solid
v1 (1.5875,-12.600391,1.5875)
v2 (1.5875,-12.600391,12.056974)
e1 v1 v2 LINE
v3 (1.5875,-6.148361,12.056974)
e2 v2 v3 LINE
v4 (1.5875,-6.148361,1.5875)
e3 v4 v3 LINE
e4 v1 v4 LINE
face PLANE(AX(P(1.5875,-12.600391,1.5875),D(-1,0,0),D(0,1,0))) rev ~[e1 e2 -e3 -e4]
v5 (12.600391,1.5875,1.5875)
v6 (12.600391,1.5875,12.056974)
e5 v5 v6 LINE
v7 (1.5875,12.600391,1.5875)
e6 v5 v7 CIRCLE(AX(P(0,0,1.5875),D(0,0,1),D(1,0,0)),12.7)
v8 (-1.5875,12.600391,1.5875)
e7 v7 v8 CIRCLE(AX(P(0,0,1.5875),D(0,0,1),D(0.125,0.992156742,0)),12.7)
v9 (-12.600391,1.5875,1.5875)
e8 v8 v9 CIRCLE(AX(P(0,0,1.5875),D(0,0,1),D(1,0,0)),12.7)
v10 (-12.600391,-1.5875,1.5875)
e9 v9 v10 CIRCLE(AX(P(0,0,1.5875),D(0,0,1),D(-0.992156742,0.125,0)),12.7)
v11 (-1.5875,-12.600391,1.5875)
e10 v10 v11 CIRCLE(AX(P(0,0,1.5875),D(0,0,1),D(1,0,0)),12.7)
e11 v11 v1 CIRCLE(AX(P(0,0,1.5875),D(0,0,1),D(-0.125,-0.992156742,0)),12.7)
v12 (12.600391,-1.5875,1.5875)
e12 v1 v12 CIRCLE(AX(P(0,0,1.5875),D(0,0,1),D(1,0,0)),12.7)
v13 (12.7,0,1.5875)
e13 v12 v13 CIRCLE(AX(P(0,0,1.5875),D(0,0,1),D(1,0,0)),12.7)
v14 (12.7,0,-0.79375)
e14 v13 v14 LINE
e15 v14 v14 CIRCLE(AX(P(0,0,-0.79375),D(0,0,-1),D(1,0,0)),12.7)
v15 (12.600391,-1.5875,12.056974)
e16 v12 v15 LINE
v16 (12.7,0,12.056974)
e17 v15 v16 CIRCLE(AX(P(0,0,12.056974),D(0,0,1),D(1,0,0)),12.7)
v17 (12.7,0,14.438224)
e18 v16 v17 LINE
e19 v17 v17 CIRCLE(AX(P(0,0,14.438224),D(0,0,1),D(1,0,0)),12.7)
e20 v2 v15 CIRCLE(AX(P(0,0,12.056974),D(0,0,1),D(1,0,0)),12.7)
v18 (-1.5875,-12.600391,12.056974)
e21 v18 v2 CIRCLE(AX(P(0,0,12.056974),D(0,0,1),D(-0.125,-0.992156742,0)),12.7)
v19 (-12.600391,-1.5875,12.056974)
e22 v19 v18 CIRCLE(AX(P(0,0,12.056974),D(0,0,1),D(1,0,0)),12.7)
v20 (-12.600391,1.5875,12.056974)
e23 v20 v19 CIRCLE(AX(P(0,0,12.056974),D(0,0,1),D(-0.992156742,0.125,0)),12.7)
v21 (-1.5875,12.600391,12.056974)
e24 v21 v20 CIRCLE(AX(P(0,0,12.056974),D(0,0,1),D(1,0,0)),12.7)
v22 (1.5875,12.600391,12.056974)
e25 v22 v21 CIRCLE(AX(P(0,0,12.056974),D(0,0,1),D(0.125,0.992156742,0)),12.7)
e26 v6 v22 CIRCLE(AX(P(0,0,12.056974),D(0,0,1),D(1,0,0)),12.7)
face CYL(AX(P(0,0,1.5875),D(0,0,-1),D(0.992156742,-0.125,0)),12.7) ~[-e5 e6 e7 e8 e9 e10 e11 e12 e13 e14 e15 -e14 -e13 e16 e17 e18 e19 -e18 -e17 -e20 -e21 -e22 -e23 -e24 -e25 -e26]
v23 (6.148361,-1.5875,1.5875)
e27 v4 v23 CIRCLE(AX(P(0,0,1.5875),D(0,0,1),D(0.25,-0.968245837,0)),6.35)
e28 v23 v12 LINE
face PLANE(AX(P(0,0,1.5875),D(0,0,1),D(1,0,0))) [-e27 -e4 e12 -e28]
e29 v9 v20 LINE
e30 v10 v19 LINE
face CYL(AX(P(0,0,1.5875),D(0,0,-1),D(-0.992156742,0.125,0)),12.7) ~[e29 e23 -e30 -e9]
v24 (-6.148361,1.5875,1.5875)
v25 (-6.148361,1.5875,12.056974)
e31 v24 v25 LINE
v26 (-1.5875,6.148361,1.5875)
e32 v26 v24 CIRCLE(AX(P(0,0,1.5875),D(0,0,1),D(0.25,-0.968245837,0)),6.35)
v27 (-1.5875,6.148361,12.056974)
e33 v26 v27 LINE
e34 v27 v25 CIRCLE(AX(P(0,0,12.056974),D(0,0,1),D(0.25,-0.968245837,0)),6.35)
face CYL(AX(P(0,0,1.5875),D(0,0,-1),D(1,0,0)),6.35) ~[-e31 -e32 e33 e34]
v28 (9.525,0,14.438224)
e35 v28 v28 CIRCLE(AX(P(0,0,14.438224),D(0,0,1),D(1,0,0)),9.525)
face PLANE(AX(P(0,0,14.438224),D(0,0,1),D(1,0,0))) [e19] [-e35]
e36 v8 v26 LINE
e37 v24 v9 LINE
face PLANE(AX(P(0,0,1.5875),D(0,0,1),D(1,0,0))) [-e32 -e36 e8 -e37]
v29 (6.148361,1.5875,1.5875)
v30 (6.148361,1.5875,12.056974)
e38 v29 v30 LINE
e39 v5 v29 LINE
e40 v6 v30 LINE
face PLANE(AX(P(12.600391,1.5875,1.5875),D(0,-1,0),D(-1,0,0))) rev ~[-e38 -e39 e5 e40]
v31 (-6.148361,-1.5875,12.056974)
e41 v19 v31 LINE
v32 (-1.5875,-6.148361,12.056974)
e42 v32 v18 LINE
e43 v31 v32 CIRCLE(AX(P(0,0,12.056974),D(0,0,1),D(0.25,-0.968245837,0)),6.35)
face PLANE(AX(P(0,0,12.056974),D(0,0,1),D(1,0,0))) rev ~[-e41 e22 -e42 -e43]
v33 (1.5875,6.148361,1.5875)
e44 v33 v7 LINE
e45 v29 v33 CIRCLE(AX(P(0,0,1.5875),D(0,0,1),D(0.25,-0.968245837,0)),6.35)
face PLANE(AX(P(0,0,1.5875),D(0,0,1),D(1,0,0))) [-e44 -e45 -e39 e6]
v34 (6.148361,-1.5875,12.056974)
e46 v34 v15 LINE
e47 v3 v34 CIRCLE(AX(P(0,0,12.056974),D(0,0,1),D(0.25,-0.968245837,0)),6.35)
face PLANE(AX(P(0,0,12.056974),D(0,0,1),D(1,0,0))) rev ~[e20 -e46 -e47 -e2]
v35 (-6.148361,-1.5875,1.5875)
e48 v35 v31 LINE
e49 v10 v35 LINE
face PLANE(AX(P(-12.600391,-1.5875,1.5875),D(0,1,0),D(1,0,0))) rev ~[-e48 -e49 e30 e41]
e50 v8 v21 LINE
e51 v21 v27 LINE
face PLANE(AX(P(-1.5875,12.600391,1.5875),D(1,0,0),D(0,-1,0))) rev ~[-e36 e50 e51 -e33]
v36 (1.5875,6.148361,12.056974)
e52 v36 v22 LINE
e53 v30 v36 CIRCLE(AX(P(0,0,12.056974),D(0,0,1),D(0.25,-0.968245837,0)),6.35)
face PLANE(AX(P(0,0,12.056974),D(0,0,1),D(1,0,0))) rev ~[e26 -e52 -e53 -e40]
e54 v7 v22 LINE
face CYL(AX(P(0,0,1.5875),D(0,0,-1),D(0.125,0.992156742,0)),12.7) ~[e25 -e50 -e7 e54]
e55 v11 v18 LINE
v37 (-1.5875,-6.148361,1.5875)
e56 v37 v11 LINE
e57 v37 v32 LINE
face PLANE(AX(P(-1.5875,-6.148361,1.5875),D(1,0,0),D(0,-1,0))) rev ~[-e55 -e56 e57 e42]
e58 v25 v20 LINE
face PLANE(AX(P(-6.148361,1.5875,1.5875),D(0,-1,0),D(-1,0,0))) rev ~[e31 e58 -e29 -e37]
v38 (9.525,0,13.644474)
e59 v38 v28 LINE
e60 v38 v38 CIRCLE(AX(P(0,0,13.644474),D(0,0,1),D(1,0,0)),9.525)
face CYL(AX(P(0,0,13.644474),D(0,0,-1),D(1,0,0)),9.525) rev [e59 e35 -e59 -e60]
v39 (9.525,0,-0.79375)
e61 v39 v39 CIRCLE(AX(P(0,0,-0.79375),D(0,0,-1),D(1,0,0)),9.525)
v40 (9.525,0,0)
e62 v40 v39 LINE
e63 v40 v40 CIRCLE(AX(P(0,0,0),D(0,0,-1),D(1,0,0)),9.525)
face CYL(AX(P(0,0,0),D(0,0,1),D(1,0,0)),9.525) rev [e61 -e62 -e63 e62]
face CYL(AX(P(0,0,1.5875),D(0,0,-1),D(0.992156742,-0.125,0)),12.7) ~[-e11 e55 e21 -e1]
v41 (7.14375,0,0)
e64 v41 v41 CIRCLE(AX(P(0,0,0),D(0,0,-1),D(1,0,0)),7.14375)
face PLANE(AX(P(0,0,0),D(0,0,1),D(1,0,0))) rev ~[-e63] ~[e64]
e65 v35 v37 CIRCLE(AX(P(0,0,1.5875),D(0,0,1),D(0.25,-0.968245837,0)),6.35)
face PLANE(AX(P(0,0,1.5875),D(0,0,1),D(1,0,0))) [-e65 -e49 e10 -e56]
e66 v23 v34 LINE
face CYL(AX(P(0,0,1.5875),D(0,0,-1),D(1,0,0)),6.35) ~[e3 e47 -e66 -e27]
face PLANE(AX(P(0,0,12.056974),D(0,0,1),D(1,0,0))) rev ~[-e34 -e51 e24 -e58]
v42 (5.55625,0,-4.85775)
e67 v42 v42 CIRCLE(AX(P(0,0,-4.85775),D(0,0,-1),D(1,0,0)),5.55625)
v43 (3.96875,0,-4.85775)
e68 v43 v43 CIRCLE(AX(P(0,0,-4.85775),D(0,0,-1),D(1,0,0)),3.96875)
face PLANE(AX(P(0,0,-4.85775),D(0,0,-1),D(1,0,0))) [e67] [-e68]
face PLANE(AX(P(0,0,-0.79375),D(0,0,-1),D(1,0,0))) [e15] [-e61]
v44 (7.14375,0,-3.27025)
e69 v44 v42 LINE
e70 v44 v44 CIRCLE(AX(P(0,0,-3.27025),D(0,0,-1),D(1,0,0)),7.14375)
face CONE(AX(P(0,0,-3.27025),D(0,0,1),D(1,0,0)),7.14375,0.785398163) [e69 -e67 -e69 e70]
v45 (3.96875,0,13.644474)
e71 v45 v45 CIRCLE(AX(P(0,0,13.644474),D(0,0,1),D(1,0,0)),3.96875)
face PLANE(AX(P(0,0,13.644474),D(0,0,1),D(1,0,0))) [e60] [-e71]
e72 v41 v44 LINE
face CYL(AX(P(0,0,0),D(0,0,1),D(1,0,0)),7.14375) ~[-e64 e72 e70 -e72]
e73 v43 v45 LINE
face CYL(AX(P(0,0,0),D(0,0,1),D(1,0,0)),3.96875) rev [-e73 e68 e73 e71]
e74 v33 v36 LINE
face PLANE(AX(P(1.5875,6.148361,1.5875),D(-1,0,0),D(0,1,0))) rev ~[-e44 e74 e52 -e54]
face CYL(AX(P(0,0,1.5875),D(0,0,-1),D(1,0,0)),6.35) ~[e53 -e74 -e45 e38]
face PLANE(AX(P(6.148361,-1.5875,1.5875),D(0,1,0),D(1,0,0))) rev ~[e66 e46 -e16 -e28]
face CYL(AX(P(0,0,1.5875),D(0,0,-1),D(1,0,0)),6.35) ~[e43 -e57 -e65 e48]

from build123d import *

# Parameters (mm, degrees)
F0_R             = 12.7
F0_R_2           = 3.96875
F1_DEPTH         = 1.5875
F2_R             = 12.7
F2_R_2           = 9.525
F3_DEPTH         = 0.79375
F4_R             = 6.35
F4_R_2           = 3.96875
F5_DEPTH         = 10.4694736
F6_R             = 12.7
F6_R_2           = 3.96875
F7_DEPTH         = 1.5875
F8_R             = 12.7
F8_R_2           = 9.525
F9_DEPTH         = 0.79375
F11_DEPTH        = 10.4694736
F11_COPIES_COUNT = 4
F12_R            = 7.14375
F12_R_2          = 3.96875
F13_DEPTH        = 4.85775
F14_SIZE         = 1.5875


# Not quite as in the source:
# - a length typed as a fraction of an inch, garbled in the dataset ("3 / 203.2 mm" for 3/8 in), is restored
# - a pattern or mirror of a feature is missing from the dataset's text; its kind, count and spacing are read off the source's solid


with BuildPart() as f1:
    # F0 (on Top) → F1 (new body)
    with BuildSketch(Plane.XY):
        Circle(F0_R)
        Circle(F0_R_2, mode=Mode.SUBTRACT)
    extrude(amount=F1_DEPTH)

    # F2 (on face) → F3 (join)
    with BuildSketch(Plane(origin=(0, 0, 0), x_dir=(1, 0, 0), z_dir=(0, 0, -1))):
        Circle(F2_R)
        Circle(F2_R_2, mode=Mode.SUBTRACT)
    extrude(amount=F3_DEPTH)

    # F4 (on face) → F5 (join)
    with BuildSketch(Plane.XY.offset(1.5875)):
        Circle(F4_R)
        Circle(F4_R_2, mode=Mode.SUBTRACT)
    extrude(amount=F5_DEPTH)

    # F6 (on face) → F7 (join)
    with BuildSketch(Plane.XY.offset(12.0569736)):
        Circle(F6_R)
        Circle(F6_R_2, mode=Mode.SUBTRACT)
    extrude(amount=F7_DEPTH)

    # F8 (on face) → F9 (join)
    with BuildSketch(Plane.XY.offset(13.6444736)):
        Circle(F8_R)
        Circle(F8_R_2, mode=Mode.SUBTRACT)
    extrude(amount=F9_DEPTH)

    # F10 (on face) → F11 (join, through all)
    with BuildSketch(Plane.XY.offset(1.5875)):
        with BuildLine():
            Line((1.5875, -12.6003906189), (1.5875, -6.1483610621))
            ThreePointArc((1.5875, -6.1483610621), (0, -6.35), (-1.5875, -6.1483610621))
            Line((-1.5875, -6.1483610621), (-1.5875, -12.6003906189))
            ThreePointArc((-1.5875, -12.6003906189), (0, -12.7), (1.5875, -12.6003906189))
        make_face()
    f11 = extrude(amount=F11_DEPTH)

    # F11_copies: F11 ×4 about axis
    f11_copies_axis = Axis((0, 0, 0), (0, 0, 1))
    for i in range(1, F11_COPIES_COUNT):
        add(f11.rotate(f11_copies_axis, i * 360 / F11_COPIES_COUNT))

    # F12 (on face) → F13 (join)
    with BuildSketch(Plane(origin=(0, 0, 0), x_dir=(1, 0, 0), z_dir=(0, 0, -1))):
        Circle(F12_R)
        Circle(F12_R_2, mode=Mode.SUBTRACT)
    extrude(amount=F13_DEPTH)

    # F14
    f14_edges = [f1.edges().sort_by_distance(p)[0] for p in [
        (-7.14375, 0, -4.85775),
    ]]
    chamfer(f14_edges, length=F14_SIZE)


solid = f1.part
